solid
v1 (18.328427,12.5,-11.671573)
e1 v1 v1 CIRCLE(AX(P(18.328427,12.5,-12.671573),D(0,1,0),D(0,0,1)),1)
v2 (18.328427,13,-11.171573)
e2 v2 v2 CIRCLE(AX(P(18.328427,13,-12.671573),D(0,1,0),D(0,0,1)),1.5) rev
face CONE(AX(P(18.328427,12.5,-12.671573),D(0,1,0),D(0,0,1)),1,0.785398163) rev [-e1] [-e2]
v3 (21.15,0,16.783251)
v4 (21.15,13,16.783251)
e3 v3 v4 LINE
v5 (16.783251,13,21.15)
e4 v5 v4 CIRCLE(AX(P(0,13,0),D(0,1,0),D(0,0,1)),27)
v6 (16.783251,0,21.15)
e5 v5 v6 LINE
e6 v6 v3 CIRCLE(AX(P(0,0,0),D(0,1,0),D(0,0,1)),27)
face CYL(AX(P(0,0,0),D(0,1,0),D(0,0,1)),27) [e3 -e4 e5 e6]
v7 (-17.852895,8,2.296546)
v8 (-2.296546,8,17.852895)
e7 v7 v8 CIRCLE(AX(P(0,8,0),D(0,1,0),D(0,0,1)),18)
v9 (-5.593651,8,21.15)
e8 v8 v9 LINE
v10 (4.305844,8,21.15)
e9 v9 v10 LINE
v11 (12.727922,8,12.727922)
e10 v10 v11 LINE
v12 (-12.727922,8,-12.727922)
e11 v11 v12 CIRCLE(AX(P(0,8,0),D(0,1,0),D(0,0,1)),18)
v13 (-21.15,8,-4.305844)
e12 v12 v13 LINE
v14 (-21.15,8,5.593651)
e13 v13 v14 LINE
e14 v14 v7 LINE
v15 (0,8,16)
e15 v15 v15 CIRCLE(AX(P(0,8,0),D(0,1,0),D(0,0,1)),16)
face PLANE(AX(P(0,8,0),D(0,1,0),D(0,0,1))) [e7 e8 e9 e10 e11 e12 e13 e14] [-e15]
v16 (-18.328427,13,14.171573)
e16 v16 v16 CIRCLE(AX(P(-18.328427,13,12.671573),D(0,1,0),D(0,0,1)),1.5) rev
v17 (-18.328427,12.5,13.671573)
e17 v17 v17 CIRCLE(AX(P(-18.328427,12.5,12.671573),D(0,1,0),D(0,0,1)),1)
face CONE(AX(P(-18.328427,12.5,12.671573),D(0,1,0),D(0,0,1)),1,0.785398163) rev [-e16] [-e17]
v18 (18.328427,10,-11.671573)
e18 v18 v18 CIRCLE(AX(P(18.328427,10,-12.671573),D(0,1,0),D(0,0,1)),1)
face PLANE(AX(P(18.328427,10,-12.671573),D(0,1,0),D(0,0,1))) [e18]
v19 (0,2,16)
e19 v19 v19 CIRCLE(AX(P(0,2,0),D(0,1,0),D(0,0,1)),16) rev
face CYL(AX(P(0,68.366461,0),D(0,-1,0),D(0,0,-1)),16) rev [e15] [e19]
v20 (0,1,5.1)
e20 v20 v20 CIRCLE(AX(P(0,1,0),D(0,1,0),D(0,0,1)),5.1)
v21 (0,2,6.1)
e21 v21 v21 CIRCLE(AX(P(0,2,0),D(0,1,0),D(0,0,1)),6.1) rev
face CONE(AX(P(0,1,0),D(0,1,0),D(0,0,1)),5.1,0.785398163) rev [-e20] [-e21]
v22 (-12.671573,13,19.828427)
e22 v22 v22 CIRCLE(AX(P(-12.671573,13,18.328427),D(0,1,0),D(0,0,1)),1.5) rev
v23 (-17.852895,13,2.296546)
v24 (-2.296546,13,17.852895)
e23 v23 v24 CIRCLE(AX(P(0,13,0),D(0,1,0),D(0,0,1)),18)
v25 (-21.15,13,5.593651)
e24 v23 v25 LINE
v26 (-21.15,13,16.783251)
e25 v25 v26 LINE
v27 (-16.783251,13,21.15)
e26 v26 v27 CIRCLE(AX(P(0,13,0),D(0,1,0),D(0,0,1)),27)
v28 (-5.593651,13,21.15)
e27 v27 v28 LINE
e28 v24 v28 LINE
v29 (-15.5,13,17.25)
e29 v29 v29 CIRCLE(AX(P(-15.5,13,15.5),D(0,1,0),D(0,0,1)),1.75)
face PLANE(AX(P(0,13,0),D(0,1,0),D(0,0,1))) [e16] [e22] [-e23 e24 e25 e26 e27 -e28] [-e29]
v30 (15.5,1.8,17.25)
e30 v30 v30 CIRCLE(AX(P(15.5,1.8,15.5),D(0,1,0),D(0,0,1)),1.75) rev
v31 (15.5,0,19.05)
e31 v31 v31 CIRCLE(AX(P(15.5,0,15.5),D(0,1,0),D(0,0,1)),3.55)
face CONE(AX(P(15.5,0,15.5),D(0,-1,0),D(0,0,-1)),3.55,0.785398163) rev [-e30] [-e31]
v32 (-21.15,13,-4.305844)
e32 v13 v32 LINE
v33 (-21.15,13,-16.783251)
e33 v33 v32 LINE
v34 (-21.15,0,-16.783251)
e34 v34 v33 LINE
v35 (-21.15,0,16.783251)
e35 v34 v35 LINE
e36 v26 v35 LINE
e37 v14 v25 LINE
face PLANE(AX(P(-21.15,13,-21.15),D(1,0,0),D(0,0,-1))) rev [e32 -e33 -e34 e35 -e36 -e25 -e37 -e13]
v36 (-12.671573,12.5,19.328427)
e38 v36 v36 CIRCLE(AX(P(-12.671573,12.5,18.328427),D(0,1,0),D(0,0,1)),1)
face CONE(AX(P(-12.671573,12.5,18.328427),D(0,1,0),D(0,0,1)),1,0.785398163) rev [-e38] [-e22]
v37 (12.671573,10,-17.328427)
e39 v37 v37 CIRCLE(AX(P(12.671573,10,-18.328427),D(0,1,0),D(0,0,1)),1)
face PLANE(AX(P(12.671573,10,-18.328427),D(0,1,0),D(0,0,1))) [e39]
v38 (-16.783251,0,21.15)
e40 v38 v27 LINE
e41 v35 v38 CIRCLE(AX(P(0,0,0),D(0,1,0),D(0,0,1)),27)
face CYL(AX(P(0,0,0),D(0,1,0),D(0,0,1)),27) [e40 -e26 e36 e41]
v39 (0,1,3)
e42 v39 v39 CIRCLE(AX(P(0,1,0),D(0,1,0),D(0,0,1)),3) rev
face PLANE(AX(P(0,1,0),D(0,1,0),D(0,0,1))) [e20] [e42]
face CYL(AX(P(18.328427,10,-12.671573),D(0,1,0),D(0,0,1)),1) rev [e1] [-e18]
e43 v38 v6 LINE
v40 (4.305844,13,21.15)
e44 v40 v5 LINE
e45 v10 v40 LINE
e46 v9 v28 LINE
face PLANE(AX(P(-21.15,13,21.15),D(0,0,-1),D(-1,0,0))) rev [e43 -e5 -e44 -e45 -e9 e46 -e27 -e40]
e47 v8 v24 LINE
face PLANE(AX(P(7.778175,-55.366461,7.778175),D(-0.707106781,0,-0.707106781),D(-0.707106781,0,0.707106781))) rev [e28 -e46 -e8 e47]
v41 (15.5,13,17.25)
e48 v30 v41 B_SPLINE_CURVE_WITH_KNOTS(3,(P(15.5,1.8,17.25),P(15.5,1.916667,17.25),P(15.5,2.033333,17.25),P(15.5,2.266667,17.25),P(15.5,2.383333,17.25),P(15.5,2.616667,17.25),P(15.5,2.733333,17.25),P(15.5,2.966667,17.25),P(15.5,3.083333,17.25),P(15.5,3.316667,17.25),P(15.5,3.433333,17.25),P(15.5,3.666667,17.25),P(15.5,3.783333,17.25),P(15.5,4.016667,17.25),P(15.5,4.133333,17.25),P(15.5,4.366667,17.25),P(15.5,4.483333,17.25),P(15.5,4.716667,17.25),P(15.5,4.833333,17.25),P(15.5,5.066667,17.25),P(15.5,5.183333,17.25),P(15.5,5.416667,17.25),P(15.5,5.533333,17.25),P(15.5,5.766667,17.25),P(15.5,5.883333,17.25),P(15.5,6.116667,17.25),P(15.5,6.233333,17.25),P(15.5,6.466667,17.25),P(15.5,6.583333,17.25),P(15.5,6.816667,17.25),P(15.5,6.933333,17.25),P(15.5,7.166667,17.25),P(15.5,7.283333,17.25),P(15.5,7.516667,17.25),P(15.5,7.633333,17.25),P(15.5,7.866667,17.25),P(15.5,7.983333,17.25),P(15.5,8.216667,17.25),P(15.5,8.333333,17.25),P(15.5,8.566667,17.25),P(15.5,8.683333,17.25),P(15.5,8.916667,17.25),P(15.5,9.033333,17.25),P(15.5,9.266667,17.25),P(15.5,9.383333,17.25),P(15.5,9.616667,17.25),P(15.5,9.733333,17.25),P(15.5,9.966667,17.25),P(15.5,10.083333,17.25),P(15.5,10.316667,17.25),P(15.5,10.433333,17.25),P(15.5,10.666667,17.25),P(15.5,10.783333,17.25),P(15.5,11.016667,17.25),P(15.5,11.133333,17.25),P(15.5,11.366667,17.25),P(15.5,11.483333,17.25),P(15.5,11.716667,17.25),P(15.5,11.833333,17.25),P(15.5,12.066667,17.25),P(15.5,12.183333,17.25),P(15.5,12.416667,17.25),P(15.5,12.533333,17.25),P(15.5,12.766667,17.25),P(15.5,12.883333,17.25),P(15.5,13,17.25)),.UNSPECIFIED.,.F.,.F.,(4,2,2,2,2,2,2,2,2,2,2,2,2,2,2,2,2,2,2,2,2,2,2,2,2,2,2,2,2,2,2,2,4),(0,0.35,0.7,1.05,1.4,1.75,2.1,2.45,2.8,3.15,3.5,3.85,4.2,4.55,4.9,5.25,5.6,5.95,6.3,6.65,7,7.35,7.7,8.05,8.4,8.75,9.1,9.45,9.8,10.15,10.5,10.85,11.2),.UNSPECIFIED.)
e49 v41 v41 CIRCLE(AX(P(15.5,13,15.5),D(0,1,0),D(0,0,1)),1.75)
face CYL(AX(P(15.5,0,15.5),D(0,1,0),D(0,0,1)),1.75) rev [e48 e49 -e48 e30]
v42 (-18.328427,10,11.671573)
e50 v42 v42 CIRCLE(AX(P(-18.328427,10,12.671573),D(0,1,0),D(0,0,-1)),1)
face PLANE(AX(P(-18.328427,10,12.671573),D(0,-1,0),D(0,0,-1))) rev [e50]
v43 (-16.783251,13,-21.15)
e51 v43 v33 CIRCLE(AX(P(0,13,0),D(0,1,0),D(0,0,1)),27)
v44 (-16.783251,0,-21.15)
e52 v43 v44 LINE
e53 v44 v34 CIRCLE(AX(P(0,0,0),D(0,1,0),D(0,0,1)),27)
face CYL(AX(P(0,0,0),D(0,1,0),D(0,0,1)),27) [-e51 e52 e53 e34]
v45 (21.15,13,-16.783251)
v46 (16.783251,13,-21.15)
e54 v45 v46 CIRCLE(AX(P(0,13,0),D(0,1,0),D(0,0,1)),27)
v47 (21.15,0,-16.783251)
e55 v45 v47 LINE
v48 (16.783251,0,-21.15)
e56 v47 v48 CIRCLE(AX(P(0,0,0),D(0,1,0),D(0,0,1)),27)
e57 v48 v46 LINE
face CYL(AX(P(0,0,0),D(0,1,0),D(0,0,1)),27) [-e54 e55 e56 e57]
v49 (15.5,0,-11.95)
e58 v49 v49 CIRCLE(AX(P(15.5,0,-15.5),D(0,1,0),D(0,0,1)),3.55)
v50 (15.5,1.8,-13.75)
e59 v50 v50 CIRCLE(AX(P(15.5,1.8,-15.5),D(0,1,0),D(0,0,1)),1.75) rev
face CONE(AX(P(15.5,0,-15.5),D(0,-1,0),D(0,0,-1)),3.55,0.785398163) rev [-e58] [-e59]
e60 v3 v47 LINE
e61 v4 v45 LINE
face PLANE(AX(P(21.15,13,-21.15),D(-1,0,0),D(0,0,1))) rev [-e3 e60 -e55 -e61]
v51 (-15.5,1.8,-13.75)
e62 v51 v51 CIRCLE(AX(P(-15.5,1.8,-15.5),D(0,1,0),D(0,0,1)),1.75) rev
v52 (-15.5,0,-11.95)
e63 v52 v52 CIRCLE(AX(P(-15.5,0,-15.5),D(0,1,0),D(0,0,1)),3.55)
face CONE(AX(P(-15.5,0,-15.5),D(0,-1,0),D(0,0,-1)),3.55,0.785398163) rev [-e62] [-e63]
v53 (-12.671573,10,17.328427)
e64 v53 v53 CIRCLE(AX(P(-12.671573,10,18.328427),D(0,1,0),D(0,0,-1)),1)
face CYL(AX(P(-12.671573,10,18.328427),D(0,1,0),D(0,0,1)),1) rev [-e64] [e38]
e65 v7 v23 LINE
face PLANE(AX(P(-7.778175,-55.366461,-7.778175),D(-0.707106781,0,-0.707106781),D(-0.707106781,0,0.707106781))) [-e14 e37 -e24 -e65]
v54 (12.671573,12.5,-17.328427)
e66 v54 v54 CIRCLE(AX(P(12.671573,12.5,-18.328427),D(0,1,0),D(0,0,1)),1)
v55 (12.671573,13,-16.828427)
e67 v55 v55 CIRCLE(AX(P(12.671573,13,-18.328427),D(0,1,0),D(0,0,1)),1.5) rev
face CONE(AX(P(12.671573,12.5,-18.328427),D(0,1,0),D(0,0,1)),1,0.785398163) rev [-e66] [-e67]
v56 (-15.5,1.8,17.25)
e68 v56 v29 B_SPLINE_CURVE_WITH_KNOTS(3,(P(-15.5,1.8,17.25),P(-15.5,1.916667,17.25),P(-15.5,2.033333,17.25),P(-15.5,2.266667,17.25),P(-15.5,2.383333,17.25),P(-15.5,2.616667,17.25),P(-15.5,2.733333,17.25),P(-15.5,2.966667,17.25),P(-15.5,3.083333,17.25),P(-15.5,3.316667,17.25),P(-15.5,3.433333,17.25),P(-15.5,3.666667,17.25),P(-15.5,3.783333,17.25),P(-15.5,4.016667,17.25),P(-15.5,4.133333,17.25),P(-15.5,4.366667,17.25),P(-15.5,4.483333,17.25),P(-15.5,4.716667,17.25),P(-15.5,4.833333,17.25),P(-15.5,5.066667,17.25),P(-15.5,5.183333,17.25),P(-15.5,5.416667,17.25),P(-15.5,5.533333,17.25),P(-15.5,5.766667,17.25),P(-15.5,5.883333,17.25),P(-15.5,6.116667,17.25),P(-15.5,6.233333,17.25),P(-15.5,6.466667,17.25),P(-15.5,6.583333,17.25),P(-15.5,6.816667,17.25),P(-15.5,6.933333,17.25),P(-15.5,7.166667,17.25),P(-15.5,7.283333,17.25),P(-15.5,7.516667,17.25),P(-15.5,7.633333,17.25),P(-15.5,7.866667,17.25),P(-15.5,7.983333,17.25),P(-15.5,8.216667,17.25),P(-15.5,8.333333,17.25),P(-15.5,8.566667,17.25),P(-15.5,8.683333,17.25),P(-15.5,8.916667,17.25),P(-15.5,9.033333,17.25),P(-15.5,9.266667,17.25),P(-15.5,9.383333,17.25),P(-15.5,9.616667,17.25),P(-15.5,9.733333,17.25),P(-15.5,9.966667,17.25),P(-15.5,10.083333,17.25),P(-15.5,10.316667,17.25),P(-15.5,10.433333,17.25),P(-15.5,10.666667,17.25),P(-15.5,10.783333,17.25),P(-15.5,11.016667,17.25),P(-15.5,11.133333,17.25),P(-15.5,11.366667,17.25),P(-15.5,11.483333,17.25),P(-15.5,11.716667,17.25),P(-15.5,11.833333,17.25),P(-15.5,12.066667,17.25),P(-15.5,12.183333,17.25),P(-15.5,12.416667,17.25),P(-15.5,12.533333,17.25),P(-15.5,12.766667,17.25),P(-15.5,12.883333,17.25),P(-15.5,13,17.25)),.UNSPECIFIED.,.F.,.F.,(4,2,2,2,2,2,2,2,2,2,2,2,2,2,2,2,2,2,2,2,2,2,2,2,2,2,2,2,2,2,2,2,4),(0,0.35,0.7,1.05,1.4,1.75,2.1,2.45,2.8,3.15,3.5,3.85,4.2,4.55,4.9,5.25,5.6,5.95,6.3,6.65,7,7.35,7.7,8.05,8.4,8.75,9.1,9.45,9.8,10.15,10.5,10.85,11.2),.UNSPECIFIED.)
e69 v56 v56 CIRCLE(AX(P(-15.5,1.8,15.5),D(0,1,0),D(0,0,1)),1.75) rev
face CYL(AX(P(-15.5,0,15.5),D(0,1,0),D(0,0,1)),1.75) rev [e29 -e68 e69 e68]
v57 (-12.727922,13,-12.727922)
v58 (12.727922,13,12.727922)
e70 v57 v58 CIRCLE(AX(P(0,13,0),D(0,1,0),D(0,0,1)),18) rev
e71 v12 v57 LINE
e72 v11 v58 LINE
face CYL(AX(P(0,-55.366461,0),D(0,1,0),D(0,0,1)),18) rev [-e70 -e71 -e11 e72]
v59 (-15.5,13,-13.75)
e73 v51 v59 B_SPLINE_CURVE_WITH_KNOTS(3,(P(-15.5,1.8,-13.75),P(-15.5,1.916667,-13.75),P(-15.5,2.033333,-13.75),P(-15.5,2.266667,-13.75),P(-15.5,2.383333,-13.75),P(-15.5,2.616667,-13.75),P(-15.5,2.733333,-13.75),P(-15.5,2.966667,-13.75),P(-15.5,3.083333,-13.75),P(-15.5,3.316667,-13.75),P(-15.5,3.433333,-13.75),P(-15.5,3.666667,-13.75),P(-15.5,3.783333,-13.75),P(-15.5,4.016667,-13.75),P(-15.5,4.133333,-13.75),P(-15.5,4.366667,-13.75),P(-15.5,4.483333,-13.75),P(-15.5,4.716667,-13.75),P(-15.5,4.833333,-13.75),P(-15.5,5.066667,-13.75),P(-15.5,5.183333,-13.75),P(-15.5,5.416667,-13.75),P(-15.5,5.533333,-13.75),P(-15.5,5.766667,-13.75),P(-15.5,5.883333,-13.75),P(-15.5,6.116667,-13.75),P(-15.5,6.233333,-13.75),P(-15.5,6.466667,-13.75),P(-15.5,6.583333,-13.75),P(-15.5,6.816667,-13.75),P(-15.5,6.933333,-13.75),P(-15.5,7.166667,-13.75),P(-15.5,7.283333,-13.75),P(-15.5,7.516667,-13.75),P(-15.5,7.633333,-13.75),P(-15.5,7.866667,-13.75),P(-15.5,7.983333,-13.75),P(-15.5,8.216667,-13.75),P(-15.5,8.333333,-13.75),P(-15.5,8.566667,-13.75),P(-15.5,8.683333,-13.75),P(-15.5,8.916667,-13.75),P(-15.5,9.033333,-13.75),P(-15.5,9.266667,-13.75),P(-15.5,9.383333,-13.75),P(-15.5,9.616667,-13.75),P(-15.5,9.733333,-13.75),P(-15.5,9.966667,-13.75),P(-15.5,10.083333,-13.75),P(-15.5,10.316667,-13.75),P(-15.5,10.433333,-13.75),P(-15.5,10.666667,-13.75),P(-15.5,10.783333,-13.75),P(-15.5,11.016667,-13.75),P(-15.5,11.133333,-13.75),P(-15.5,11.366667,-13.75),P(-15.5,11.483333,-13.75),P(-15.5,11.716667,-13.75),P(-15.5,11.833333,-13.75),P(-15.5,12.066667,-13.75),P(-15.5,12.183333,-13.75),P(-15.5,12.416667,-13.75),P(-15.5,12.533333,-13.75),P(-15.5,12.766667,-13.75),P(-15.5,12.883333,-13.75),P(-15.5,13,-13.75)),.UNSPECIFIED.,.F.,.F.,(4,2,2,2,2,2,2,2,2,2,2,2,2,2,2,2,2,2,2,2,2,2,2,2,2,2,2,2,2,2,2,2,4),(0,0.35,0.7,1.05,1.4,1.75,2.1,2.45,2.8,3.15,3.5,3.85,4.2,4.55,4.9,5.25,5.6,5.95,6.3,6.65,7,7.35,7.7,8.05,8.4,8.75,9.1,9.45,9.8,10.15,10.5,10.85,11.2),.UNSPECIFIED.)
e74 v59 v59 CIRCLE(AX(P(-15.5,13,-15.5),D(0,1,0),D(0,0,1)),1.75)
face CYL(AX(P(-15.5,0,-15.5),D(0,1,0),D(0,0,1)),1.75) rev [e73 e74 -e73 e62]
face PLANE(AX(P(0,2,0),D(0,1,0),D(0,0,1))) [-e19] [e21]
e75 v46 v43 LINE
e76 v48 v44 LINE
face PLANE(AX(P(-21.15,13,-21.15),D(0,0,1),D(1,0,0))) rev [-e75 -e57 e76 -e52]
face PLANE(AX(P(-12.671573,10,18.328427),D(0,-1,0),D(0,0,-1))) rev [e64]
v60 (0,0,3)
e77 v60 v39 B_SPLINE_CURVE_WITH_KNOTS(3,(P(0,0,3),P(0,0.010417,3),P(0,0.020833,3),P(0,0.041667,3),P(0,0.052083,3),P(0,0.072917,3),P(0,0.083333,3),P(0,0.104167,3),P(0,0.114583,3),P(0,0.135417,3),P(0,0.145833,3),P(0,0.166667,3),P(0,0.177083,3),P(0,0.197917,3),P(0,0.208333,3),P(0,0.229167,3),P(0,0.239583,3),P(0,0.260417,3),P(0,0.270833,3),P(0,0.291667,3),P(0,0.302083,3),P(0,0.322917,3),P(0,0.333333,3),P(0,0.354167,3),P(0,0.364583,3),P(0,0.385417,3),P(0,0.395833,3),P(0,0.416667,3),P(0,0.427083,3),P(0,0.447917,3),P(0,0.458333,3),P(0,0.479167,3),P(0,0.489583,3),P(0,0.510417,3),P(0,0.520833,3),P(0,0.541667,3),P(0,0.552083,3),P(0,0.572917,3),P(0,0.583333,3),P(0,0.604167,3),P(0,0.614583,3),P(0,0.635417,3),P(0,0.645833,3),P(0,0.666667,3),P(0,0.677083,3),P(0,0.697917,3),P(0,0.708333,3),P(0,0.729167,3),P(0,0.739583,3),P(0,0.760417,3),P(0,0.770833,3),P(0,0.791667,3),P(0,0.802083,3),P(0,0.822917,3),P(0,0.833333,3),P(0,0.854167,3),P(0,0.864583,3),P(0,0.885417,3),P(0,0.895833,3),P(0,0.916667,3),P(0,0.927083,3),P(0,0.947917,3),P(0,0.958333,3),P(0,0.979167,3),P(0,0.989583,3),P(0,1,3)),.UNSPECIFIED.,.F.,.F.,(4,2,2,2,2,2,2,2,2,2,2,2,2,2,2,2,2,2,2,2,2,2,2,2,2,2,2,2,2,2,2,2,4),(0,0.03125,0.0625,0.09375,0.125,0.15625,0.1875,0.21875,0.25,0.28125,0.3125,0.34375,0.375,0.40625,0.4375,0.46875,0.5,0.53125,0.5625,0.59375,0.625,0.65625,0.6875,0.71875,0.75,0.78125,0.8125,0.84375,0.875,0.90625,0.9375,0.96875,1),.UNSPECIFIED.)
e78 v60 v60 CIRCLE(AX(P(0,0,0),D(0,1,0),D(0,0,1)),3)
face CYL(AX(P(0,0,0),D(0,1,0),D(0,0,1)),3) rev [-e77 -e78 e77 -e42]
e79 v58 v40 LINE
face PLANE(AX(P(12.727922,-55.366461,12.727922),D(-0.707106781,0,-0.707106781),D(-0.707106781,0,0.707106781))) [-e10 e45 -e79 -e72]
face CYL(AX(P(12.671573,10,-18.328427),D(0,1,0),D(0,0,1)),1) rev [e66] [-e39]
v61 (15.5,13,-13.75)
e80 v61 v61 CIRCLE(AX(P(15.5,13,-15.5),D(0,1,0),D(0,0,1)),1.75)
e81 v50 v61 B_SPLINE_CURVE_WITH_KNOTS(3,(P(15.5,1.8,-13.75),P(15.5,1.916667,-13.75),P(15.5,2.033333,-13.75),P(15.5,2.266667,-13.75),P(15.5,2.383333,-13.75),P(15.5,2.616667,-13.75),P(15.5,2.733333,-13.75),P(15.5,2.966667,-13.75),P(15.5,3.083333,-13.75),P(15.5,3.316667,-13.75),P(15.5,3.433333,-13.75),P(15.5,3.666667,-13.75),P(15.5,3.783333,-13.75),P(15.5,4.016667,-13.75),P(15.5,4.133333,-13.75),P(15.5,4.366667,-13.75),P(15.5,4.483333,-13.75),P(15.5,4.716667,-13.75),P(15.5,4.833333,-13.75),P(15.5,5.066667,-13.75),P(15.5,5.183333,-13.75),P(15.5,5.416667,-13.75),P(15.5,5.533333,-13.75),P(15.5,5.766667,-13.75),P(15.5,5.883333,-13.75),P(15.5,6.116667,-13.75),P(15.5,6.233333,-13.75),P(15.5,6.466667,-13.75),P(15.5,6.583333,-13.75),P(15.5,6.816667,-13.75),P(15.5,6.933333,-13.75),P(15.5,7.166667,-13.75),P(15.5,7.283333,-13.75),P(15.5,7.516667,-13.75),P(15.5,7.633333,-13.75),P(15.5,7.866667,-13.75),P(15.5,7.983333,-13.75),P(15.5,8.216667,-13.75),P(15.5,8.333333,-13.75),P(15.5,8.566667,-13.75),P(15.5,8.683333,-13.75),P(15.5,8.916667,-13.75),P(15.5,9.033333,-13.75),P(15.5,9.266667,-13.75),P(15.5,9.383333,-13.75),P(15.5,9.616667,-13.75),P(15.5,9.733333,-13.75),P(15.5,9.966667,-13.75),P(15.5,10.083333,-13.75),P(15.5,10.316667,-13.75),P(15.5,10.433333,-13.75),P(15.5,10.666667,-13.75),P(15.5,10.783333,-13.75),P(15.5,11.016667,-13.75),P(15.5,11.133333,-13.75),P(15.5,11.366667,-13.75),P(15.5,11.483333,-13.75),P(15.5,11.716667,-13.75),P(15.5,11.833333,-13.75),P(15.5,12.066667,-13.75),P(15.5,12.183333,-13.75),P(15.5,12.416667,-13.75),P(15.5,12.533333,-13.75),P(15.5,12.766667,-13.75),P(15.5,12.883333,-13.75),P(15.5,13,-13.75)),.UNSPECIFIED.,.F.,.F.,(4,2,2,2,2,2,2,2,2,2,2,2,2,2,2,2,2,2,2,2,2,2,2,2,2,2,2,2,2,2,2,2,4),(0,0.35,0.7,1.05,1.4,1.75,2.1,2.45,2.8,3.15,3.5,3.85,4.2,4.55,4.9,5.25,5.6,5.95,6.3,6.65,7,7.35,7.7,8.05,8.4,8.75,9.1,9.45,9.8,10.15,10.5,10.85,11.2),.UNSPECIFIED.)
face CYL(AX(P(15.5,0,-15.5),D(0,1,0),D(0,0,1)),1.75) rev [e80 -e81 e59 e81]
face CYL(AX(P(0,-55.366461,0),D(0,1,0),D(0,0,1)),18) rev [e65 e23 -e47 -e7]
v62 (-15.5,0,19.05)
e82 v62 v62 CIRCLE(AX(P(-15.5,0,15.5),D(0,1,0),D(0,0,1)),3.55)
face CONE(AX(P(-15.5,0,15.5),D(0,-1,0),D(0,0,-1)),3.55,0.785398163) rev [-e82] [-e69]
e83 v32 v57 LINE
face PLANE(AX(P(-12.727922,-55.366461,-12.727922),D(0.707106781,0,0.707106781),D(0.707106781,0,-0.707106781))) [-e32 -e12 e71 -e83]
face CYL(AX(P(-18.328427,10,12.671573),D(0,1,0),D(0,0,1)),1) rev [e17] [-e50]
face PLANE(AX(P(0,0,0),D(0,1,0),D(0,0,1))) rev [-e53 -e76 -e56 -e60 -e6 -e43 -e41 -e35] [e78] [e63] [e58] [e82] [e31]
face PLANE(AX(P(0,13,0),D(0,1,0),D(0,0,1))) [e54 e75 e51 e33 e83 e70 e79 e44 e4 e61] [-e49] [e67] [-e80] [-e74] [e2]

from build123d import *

# Parameters (mm, degrees)
SKETCH2_W           = 42.3
SKETCH2_H           = 42.3
BOSS_EXTRUDE1_DEPTH = 13
SKETCH3_R           = 3
CUT_EXTRUDE1_DEPTH  = 33.613570795
SKETCH4_R           = 1.75
CUT_EXTRUDE2_DEPTH  = 33.613570795
SKETCH5_R           = 29.910616844
SKETCH5_R_2         = 27
CUT_EXTRUDE4_DEPTH  = 33.613570795
SKETCH6_R           = 3
CUT_EXTRUDE5_DEPTH  = 11
CHAMFER1_SIZE       = 1.8
SKETCH7_R           = 5.1
CUT_EXTRUDE6_DEPTH  = 1
BOSS_EXTRUDE2_START = 6
SKETCH8_R           = 16
BOSS_EXTRUDE2_DEPTH = 6
CHAMFER2_SIZE       = 1
SKETCH9_R           = 1
CUT_EXTRUDE7_DEPTH  = 3
CHAMFER3_SIZE       = 0.5


with BuildPart() as part:
    # Sketch2 → Boss-Extrude1 (new body)
    with BuildSketch(Plane(origin=(0, 0, 0), x_dir=(1, 0, 0), z_dir=(0, 1, 0))):
        Rectangle(SKETCH2_W, SKETCH2_H)
    extrude(amount=BOSS_EXTRUDE1_DEPTH)

    # Sketch3 → Cut-Extrude1 (cut, through all)
    with BuildSketch(Plane(origin=(0, 13, 0), x_dir=(1, 0, 0), z_dir=(0, 1, 0))):
        with Locations(Location((0, 0, 0), (0, 0, 270))):
            Circle(SKETCH3_R)
    extrude(amount=-CUT_EXTRUDE1_DEPTH, mode=Mode.SUBTRACT)

    # Sketch4 → Cut-Extrude2 (cut, through all)
    with BuildSketch(Plane(origin=(0, 13, 0), x_dir=(1, 0, 0), z_dir=(0, 1, 0))):
        with Locations(Location((-15.5, 15.5, 0), (0, 0, 270))):
            Circle(SKETCH4_R)
        with Locations(Location((15.5, 15.5, 0), (0, 0, 270))):
            Circle(SKETCH4_R)
        with Locations(Location((15.5, -15.5, 0), (0, 0, 270))):
            Circle(SKETCH4_R)
        with Locations(Location((-15.5, -15.5, 0), (0, 0, 270))):
            Circle(SKETCH4_R)
    extrude(amount=-CUT_EXTRUDE2_DEPTH, mode=Mode.SUBTRACT)

    # Sketch5 → Cut-Extrude4 (cut, through all)
    with BuildSketch(Plane(origin=(0, 13, 0), x_dir=(1, 0, 0), z_dir=(0, 1, 0))):
        Circle(SKETCH5_R)
        Circle(SKETCH5_R_2, mode=Mode.SUBTRACT)
    extrude(amount=-CUT_EXTRUDE4_DEPTH, mode=Mode.SUBTRACT)

    # Sketch6 → Cut-Extrude5 (cut)
    with BuildSketch(Plane(origin=(0, 13, 0), x_dir=(1, 0, 0), z_dir=(0, 1, 0))):
        with BuildLine():
            Line((-12.727922061, 12.727922061), (-21.15, 4.305844123))
            Line((-21.15, 4.305844123), (-21.15, -5.593650814))
            Line((-21.15, -5.593650814), (-17.852895433, -2.296546247))
            ThreePointArc((-17.852895433, -2.296546247), (-12.727922061, -12.727922061), (-2.296546247, -17.852895433))
            Line((-2.296546247, -17.852895433), (-5.593650814, -21.15))
            Line((-5.593650814, -21.15), (4.305844123, -21.15))
            Line((4.305844123, -21.15), (12.727922061, -12.727922061))
            ThreePointArc((12.727922061, -12.727922061), (12.727922061, 12.727922061), (-12.727922061, 12.727922061))
        make_face()
        with Locations(Location((0, 0, 0), (0, 0, 270))):
            Circle(SKETCH6_R, mode=Mode.SUBTRACT)
    extrude(amount=-CUT_EXTRUDE5_DEPTH, mode=Mode.SUBTRACT)

    # Chamfer1
    chamfer1_edges = [part.edges().sort_by_distance(p)[0] for p in [
        (-15.5, 0, 13.75),
        (15.5, 0, 13.75),
        (15.5, 0, -17.25),
        (-15.5, 0, -17.25),
    ]]
    chamfer(chamfer1_edges, length=CHAMFER1_SIZE)

    # Sketch7 → Cut-Extrude6 (cut)
    with BuildSketch(Plane(origin=(0, 2, 0), x_dir=(1, 0, 0), z_dir=(0, 1, 0))):
        with Locations(Location((0, 0, 0), (0, 0, 270))):
            Circle(SKETCH7_R)
    extrude(amount=-CUT_EXTRUDE6_DEPTH, mode=Mode.SUBTRACT)

    # Sketch8 → Boss-Extrude2 (add)
    with BuildSketch(Plane(origin=(0, 2, 0), x_dir=(1, 0, 0), z_dir=(0, 1, 0)).offset(BOSS_EXTRUDE2_START)):
        with BuildLine():
            Line((-21.15, 4.305844123), (-21.15, -5.593650814))
            Line((-21.15, -5.593650814), (-17.852895433, -2.296546247))
            ThreePointArc((-17.852895433, -2.296546247), (-12.727922061, -12.727922061), (-2.296546247, -17.852895433))
            Line((-2.296546247, -17.852895433), (-5.593650814, -21.15))
            Line((-5.593650814, -21.15), (4.305844123, -21.15))
            Line((4.305844123, -21.15), (12.727922061, -12.727922061))
            ThreePointArc((12.727922061, -12.727922061), (12.727922061, 12.727922061), (-12.727922061, 12.727922061))
            Line((-12.727922061, 12.727922061), (-21.15, 4.305844123))
        make_face()
        with Locations(Location((0, 0, 0), (0, 0, 270))):
            Circle(SKETCH8_R, mode=Mode.SUBTRACT)
    extrude(amount=-BOSS_EXTRUDE2_DEPTH)

    # Chamfer2
    chamfer2_edges = [part.edges().sort_by_distance(p)[0] for p in [
        (0, 2, -5.1),
    ]]
    chamfer(chamfer2_edges, length=CHAMFER2_SIZE - 0.0001)  # a hair under: the kernel refuses the full size

    # Sketch9 → Cut-Extrude7 (cut)
    with BuildSketch(Plane(origin=(0, 13, 0), x_dir=(1, 0, 0), z_dir=(0, 1, 0))):
        with Locations(Location((12.671572875, 18.328427125, 0), (0, 0, 270))):
            Circle(SKETCH9_R)
        with Locations(Location((18.328427125, 12.671572875, 0), (0, 0, 270))):
            Circle(SKETCH9_R)
        with Locations(Location((-12.671572875, -18.328427125, 0), (0, 0, 90))):
            Circle(SKETCH9_R)
        with Locations(Location((-18.328427125, -12.671572875, 0), (0, 0, 90))):
            Circle(SKETCH9_R)
    extrude(amount=-CUT_EXTRUDE7_DEPTH, mode=Mode.SUBTRACT)

    # Chamfer3
    chamfer3_edges = [part.edges().sort_by_distance(p)[0] for p in [
        (18.328427125, 13, -13.671572875),
        (12.671572875, 13, -19.328427125),
        (-12.671572875, 13, 19.328427125),
        (-18.328427125, 13, 13.671572875),
    ]]
    chamfer(chamfer3_edges, length=CHAMFER3_SIZE)


solid = part.part
